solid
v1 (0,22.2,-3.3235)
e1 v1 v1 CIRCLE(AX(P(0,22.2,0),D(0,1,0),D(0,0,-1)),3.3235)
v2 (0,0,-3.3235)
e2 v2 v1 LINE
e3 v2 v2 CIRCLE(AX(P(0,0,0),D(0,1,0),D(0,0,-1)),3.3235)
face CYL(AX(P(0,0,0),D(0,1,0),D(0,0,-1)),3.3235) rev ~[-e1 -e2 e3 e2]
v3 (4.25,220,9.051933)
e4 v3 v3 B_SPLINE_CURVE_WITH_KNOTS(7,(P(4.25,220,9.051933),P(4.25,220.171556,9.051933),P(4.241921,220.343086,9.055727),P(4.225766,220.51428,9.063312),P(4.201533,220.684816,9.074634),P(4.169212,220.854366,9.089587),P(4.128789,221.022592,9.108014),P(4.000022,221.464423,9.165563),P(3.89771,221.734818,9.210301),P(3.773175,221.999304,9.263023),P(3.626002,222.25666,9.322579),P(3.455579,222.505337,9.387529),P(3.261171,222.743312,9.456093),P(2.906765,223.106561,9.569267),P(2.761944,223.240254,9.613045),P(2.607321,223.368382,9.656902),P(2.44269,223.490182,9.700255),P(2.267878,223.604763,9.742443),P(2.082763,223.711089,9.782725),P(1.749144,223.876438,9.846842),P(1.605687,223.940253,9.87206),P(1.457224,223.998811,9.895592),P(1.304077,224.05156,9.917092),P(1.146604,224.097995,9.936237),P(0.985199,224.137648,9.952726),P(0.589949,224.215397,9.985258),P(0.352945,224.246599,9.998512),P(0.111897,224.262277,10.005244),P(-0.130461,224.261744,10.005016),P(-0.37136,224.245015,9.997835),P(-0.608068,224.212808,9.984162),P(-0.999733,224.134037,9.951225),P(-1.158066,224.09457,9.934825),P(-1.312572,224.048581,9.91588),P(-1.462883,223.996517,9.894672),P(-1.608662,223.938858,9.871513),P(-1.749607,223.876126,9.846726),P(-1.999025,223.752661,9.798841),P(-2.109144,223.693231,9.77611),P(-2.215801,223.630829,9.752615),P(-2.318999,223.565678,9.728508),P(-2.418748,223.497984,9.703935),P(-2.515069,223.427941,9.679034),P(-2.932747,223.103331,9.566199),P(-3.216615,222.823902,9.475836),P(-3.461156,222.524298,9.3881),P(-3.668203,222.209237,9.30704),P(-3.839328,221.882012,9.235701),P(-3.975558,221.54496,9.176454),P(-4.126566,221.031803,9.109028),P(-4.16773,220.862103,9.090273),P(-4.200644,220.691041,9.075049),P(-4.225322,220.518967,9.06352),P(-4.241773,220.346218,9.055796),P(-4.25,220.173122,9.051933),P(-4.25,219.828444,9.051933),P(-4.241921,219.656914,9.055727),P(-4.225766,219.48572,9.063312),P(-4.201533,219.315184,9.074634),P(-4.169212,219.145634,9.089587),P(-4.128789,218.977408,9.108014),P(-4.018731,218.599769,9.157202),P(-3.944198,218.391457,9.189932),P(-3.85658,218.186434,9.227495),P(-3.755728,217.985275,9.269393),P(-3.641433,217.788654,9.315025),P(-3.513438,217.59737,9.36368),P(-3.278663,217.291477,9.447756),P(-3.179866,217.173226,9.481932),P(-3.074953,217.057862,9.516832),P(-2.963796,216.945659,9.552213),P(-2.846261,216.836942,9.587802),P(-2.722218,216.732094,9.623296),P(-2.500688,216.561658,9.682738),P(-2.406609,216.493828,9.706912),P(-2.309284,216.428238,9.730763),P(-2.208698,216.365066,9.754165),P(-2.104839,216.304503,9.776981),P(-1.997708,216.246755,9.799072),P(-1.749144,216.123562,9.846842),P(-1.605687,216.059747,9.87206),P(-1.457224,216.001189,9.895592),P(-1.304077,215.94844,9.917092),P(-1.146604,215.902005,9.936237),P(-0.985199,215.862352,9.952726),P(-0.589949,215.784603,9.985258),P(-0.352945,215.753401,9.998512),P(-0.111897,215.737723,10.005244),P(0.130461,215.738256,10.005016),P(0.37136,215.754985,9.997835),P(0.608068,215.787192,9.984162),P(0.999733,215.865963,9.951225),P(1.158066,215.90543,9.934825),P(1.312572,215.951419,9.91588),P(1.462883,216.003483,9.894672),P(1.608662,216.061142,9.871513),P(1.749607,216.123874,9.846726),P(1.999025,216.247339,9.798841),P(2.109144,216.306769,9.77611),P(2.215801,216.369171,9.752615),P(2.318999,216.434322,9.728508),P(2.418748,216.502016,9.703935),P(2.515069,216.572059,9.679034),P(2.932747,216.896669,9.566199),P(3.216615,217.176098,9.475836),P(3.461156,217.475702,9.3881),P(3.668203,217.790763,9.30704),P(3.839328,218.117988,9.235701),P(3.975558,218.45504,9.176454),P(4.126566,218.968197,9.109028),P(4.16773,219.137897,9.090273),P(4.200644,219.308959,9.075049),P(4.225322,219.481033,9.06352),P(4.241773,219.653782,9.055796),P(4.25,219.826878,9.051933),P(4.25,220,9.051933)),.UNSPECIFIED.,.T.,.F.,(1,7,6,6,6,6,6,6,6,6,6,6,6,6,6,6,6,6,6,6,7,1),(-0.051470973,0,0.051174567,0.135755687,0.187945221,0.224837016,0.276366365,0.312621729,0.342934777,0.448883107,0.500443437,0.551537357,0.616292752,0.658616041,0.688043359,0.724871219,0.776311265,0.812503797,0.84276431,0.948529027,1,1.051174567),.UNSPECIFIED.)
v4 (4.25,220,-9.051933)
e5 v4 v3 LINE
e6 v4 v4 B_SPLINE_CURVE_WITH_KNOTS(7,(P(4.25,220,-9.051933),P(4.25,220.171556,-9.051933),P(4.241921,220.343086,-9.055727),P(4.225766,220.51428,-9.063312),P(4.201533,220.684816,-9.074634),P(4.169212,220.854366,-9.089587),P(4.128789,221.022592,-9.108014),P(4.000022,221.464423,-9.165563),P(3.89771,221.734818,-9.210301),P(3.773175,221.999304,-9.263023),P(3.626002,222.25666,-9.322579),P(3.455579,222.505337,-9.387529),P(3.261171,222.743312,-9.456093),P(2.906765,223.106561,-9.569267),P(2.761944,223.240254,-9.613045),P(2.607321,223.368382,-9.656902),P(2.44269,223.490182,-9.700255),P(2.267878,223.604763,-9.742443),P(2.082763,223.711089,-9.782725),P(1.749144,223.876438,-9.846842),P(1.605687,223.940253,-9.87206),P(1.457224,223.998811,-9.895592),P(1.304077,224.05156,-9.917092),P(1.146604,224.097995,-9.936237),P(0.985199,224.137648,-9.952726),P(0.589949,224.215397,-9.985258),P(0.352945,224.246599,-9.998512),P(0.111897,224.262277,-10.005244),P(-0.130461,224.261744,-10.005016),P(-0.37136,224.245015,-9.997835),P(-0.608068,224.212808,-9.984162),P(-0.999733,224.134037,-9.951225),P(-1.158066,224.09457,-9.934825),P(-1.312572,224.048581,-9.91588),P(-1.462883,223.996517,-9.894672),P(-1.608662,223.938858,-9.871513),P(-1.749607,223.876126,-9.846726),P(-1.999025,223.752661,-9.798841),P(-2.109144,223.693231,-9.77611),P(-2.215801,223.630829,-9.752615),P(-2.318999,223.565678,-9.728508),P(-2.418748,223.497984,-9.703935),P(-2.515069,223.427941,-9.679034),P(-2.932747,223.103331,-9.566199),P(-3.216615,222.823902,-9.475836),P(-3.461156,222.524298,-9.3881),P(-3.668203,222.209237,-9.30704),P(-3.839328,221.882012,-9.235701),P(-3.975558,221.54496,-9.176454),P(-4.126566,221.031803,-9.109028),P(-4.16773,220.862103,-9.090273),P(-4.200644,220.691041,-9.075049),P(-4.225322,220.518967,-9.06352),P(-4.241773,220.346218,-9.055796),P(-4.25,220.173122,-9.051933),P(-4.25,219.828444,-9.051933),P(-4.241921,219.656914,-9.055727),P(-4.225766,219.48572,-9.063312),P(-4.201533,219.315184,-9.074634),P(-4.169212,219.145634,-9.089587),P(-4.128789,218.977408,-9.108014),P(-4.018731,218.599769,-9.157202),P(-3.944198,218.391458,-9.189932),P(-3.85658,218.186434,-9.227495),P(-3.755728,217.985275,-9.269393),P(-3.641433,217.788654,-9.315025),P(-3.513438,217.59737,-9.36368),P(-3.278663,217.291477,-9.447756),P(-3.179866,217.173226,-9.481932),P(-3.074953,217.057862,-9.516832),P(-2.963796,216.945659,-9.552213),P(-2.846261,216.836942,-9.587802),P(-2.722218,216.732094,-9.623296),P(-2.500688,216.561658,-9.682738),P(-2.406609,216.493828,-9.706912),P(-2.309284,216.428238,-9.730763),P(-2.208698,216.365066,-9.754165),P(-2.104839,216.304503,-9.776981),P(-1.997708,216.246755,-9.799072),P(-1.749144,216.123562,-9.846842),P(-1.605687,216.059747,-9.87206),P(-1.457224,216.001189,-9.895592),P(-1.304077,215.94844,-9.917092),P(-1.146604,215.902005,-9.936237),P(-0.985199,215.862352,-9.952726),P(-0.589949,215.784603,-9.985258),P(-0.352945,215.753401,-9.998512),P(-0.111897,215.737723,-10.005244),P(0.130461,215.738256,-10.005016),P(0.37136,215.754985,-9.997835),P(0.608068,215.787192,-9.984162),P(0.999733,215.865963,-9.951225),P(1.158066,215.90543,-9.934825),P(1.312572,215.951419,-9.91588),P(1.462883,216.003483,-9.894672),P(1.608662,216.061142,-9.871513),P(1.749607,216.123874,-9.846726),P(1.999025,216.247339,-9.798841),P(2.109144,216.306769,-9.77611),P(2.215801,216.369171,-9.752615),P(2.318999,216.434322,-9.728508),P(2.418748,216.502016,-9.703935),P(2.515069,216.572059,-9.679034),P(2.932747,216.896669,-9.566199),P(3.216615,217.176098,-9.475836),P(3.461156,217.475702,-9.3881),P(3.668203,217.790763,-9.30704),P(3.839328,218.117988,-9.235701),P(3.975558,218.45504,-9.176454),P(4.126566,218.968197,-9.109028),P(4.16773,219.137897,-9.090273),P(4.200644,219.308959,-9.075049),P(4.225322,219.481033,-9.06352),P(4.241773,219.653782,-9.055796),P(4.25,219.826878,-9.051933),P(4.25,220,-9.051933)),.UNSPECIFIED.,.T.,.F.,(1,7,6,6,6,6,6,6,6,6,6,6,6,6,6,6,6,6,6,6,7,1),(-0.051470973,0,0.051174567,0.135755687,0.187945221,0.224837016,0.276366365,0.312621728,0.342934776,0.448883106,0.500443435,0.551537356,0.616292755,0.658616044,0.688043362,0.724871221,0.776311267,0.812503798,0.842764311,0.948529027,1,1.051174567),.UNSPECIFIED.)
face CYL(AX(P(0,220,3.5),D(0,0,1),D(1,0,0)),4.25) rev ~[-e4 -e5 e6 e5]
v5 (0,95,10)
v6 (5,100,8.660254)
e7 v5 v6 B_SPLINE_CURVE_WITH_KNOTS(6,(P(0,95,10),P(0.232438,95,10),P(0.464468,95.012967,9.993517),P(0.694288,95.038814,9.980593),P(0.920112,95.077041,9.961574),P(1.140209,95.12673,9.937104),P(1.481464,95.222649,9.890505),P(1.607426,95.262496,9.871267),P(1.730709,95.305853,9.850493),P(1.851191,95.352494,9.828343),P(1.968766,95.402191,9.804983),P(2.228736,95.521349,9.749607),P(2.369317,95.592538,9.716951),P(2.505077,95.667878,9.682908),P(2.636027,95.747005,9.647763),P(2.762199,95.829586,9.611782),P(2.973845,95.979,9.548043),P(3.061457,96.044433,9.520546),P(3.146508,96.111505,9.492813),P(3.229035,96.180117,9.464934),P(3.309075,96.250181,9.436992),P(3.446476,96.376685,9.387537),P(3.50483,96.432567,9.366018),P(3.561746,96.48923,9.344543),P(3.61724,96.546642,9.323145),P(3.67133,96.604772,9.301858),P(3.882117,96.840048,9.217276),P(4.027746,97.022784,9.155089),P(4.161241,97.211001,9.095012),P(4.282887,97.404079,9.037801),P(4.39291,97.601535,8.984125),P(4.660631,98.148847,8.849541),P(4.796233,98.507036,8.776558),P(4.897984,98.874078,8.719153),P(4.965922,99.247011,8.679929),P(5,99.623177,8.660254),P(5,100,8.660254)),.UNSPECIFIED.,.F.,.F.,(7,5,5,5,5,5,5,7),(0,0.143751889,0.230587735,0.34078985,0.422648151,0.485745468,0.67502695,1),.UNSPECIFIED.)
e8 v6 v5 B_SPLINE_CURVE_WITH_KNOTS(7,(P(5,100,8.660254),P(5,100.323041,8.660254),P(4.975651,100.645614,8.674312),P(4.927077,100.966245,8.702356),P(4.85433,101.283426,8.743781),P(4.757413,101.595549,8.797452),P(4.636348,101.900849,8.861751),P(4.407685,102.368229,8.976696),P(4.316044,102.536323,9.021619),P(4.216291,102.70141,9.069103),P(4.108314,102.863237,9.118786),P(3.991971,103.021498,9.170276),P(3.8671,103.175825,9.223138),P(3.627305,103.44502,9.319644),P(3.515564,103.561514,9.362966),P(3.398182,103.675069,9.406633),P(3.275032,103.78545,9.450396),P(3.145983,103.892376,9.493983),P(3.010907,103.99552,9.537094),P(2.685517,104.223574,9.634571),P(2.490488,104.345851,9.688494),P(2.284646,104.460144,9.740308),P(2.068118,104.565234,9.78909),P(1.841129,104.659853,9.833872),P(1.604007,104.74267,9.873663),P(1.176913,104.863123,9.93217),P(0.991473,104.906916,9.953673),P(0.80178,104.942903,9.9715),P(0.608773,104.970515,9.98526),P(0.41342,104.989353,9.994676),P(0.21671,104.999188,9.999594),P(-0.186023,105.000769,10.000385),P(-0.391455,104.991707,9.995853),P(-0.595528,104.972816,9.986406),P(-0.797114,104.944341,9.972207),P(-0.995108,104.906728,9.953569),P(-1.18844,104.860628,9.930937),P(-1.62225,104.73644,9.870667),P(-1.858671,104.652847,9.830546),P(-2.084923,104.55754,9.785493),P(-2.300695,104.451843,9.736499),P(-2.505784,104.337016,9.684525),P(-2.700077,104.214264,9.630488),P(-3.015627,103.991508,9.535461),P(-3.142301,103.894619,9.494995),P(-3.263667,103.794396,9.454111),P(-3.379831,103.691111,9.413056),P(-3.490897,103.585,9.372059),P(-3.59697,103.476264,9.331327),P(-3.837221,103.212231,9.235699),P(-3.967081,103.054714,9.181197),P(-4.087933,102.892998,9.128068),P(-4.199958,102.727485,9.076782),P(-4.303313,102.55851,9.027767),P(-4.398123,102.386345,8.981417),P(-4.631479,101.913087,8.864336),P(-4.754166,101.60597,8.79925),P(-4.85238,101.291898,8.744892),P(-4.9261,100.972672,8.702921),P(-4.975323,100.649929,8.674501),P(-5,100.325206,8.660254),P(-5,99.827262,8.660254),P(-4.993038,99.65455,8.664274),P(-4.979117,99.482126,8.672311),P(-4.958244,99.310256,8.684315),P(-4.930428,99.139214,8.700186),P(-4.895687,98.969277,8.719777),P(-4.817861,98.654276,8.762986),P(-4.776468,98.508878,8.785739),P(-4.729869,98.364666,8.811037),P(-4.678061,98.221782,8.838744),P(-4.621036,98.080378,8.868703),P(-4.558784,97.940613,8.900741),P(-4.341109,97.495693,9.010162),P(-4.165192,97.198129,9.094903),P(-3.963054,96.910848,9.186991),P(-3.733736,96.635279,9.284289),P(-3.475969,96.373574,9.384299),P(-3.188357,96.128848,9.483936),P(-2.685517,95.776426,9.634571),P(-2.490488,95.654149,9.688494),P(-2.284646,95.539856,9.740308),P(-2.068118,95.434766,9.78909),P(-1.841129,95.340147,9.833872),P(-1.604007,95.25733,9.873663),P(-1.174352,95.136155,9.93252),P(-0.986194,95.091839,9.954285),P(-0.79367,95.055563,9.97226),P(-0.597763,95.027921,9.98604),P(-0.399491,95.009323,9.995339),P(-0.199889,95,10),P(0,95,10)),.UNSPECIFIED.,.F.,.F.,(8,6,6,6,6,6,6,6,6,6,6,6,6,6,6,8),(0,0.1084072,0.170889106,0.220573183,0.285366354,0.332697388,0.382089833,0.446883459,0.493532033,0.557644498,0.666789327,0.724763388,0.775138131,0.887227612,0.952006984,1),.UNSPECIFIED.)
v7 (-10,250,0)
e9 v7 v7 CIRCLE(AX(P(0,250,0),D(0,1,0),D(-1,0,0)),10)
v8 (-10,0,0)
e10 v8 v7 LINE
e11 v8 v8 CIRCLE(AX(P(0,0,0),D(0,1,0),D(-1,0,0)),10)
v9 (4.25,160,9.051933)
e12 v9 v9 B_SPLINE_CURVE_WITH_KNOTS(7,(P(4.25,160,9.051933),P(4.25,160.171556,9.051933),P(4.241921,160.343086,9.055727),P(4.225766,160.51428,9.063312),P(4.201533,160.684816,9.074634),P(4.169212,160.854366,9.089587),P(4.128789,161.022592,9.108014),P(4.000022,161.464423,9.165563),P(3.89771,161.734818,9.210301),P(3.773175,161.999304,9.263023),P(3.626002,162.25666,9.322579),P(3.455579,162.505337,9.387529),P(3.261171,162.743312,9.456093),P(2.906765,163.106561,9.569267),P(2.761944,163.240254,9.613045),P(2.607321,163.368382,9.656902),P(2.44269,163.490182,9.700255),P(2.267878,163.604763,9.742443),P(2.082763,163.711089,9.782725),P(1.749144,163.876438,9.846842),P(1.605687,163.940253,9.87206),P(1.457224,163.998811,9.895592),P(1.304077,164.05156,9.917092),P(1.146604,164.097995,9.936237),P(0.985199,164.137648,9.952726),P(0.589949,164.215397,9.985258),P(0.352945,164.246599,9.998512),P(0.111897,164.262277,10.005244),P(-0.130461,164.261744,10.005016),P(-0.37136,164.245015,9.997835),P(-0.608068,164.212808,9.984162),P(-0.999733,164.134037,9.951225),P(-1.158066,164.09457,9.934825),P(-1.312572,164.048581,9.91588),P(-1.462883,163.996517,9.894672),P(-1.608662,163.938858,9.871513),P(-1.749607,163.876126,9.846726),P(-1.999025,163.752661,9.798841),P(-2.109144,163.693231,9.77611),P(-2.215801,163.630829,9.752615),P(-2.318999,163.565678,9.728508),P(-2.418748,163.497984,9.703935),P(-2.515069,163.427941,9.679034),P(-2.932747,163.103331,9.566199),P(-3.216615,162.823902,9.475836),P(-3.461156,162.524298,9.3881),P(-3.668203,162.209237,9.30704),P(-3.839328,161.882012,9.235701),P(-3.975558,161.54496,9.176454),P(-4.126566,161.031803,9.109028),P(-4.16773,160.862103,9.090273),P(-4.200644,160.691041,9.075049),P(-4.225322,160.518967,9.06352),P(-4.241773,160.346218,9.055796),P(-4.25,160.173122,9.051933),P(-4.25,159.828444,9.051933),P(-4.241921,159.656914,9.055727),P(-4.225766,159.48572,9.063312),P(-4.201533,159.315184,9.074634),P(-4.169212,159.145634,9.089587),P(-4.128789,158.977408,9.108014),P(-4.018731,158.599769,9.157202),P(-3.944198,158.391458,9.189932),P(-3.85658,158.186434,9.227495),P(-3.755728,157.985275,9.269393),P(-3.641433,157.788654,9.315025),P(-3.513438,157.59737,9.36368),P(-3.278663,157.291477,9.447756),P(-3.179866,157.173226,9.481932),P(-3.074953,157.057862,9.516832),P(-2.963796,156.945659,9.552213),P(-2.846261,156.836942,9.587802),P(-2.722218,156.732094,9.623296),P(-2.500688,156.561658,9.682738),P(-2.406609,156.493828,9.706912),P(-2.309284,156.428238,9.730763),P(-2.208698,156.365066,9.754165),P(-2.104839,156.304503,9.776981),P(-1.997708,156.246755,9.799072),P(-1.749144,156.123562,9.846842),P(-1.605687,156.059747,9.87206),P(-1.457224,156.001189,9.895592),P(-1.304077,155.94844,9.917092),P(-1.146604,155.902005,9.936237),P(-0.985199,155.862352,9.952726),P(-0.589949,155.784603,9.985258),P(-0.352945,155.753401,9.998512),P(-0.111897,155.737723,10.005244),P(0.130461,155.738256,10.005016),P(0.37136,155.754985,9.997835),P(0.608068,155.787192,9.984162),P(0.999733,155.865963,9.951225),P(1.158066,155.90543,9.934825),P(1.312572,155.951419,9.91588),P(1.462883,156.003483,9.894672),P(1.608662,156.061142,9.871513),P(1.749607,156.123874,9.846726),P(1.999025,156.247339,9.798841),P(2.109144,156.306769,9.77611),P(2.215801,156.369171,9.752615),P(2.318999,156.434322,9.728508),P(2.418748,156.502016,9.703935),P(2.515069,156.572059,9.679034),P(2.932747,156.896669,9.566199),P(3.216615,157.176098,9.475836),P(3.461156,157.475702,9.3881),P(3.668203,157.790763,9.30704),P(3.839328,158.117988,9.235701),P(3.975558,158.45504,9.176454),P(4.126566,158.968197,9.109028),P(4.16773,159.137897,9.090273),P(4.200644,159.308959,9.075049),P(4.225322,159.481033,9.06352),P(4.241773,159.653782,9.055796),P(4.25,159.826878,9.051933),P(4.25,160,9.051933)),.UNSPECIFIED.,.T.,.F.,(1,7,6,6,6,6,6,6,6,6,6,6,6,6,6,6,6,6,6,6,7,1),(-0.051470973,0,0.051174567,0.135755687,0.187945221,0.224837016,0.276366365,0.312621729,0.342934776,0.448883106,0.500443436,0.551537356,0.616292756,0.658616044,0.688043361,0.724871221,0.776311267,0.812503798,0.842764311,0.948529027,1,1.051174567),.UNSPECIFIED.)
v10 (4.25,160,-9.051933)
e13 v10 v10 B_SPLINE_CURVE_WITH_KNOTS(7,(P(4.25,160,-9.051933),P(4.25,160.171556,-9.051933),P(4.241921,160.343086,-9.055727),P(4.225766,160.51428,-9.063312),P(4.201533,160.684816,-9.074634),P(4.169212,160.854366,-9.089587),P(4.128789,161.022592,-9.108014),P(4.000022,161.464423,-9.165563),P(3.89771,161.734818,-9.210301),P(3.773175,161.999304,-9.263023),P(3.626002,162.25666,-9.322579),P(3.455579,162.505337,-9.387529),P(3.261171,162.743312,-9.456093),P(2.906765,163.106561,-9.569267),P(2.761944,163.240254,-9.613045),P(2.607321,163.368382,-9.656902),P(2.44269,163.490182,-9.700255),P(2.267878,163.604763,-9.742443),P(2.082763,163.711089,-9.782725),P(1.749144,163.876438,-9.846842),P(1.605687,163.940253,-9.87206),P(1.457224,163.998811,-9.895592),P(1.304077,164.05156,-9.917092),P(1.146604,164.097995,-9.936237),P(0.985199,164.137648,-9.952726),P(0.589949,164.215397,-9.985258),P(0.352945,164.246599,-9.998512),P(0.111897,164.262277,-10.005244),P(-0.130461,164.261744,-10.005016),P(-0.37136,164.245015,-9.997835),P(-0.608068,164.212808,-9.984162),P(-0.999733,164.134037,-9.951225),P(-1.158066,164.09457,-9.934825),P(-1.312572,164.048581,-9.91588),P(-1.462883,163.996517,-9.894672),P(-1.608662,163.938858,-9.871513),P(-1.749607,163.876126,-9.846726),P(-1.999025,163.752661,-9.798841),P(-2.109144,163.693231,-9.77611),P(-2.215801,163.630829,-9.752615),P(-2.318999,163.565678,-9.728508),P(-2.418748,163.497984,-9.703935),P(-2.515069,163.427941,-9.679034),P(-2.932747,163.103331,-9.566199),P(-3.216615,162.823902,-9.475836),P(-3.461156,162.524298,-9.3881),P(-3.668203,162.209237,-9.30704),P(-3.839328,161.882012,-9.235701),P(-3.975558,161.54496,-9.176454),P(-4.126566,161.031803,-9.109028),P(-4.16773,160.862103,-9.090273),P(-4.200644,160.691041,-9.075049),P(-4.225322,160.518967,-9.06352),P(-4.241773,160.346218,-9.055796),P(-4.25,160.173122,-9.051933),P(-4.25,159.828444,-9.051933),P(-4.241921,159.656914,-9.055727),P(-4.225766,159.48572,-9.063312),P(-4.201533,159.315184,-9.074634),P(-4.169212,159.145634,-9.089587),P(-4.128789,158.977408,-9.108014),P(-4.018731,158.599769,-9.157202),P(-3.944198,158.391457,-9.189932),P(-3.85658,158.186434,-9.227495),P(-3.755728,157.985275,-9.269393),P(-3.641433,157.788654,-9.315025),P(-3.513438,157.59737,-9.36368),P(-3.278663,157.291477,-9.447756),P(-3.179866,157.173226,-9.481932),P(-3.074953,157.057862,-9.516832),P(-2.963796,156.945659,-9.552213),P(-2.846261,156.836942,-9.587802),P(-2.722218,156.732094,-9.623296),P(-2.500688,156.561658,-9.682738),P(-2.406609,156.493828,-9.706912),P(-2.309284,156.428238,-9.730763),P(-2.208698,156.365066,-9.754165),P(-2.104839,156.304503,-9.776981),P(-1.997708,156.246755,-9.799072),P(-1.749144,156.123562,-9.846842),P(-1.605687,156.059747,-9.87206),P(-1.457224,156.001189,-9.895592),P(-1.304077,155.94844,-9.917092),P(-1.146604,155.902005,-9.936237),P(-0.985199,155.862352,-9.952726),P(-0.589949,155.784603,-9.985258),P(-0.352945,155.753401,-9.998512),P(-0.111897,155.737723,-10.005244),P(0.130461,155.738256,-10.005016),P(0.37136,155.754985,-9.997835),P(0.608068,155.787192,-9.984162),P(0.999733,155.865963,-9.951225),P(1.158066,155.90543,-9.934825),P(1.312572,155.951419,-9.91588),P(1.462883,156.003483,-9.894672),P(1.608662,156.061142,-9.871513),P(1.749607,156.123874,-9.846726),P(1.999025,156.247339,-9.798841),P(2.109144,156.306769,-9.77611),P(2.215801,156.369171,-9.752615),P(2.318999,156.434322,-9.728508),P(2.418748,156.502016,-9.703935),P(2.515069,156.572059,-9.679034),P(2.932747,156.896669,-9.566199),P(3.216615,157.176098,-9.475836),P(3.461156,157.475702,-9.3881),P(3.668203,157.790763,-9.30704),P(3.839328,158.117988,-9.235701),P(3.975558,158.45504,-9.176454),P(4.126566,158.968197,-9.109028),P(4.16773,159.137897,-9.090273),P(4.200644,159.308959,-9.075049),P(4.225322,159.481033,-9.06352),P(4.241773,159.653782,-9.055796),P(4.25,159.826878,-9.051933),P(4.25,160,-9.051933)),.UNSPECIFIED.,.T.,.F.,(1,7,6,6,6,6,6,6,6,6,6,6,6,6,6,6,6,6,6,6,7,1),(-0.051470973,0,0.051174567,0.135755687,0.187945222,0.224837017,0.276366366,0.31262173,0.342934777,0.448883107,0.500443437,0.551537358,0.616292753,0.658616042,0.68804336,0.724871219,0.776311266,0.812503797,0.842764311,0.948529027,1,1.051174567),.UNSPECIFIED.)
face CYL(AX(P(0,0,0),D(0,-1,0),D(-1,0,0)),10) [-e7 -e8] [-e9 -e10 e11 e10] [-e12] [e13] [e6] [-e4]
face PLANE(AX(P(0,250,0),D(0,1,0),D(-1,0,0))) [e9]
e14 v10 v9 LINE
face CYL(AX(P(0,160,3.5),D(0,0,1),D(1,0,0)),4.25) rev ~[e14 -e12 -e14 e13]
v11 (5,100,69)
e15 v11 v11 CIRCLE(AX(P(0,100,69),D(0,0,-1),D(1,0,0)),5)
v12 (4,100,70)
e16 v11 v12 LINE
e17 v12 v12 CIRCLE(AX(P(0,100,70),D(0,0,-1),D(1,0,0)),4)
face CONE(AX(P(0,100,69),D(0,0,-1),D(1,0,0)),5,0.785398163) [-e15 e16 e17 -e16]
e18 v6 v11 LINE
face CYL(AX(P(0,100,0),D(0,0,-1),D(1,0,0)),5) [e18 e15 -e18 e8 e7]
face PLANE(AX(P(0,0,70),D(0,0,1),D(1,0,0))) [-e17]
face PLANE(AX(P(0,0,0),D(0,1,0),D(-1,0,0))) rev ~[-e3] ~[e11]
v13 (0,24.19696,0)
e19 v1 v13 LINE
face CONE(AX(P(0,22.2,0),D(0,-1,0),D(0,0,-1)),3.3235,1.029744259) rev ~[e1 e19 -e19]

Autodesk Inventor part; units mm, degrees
ref_plane "YZ Plane" through (0, 0, 0) normal (1, 0, 0) x (0, 1, 0)
ref_plane "XZ Plane" through (0, 0, 0) normal (0, 1, 0) x (-1, 0, 0)
sketch "Skizze1" plane through (0, 0, 0) normal (0, 1, 0) x (-1, 0, 0)
  circle A0 centre (0, 0) radius 10
  dimension "d17" = 20
extrude "Extrusion1" add sketch "Skizze1" along normal blind 250
sketch "Skizze4" plane through (0, 0, 0) normal (0, 0, 1) x (1, 0, 0)
  line L0 (0, 0) -> (0, 100)
  circle A0 centre (0, 100) radius 5
  dimension "d10" = 100
  dimension "d11" = 10
extrude "Extrusion3" add sketch "Skizze4" along normal blind 70
ref_plane "Arbeitsebene1" through (0, 0, 3.5) normal (0, 0, 1) x (1, 0, 0)
sketch "Skizze6" plane through (0, 0, 3.5) normal (0, 0, 1) x (1, 0, 0)
  line L0 (10, 250) -> (-10, 250) projected
  line L1 (0, 250) -> (0, 220)
  circle A0 centre (0, 220) radius 4.25
  line L2 (0, 220) -> (0, 160)
  circle A1 centre (0, 160) radius 4.25
  point P0 (0, 0)
  dimension "d19" = 30
  dimension "d20" = 8.5
  dimension "d21" = 60
  dimension "d22" = 8.5
extrude "Extrusion5" cut sketch "Skizze6" along normal through all both and the other way through all
chamfer "Fasen1" distance 1 angle 45 1 edges at (-5, 100, 70)
thread "Gewinde2" size "M10x1.5" class "6g" standard "ANSI Metric M Profile" length 20
sketch "Skizze7" plane through (0, 0, 0) normal (0, -1, 0) x (1, 0, 0)
  point P0 (0, 0)
hole "Bohrung1" at (0, 0, 0) direction (0, 1, 0) diameter 6.647 depth 22.2 tip angle 118 thread size "M8x1.25" class "6H" standard "ISO Metric profile"
properties part number "Ruderstange" material "Edelstahl"
